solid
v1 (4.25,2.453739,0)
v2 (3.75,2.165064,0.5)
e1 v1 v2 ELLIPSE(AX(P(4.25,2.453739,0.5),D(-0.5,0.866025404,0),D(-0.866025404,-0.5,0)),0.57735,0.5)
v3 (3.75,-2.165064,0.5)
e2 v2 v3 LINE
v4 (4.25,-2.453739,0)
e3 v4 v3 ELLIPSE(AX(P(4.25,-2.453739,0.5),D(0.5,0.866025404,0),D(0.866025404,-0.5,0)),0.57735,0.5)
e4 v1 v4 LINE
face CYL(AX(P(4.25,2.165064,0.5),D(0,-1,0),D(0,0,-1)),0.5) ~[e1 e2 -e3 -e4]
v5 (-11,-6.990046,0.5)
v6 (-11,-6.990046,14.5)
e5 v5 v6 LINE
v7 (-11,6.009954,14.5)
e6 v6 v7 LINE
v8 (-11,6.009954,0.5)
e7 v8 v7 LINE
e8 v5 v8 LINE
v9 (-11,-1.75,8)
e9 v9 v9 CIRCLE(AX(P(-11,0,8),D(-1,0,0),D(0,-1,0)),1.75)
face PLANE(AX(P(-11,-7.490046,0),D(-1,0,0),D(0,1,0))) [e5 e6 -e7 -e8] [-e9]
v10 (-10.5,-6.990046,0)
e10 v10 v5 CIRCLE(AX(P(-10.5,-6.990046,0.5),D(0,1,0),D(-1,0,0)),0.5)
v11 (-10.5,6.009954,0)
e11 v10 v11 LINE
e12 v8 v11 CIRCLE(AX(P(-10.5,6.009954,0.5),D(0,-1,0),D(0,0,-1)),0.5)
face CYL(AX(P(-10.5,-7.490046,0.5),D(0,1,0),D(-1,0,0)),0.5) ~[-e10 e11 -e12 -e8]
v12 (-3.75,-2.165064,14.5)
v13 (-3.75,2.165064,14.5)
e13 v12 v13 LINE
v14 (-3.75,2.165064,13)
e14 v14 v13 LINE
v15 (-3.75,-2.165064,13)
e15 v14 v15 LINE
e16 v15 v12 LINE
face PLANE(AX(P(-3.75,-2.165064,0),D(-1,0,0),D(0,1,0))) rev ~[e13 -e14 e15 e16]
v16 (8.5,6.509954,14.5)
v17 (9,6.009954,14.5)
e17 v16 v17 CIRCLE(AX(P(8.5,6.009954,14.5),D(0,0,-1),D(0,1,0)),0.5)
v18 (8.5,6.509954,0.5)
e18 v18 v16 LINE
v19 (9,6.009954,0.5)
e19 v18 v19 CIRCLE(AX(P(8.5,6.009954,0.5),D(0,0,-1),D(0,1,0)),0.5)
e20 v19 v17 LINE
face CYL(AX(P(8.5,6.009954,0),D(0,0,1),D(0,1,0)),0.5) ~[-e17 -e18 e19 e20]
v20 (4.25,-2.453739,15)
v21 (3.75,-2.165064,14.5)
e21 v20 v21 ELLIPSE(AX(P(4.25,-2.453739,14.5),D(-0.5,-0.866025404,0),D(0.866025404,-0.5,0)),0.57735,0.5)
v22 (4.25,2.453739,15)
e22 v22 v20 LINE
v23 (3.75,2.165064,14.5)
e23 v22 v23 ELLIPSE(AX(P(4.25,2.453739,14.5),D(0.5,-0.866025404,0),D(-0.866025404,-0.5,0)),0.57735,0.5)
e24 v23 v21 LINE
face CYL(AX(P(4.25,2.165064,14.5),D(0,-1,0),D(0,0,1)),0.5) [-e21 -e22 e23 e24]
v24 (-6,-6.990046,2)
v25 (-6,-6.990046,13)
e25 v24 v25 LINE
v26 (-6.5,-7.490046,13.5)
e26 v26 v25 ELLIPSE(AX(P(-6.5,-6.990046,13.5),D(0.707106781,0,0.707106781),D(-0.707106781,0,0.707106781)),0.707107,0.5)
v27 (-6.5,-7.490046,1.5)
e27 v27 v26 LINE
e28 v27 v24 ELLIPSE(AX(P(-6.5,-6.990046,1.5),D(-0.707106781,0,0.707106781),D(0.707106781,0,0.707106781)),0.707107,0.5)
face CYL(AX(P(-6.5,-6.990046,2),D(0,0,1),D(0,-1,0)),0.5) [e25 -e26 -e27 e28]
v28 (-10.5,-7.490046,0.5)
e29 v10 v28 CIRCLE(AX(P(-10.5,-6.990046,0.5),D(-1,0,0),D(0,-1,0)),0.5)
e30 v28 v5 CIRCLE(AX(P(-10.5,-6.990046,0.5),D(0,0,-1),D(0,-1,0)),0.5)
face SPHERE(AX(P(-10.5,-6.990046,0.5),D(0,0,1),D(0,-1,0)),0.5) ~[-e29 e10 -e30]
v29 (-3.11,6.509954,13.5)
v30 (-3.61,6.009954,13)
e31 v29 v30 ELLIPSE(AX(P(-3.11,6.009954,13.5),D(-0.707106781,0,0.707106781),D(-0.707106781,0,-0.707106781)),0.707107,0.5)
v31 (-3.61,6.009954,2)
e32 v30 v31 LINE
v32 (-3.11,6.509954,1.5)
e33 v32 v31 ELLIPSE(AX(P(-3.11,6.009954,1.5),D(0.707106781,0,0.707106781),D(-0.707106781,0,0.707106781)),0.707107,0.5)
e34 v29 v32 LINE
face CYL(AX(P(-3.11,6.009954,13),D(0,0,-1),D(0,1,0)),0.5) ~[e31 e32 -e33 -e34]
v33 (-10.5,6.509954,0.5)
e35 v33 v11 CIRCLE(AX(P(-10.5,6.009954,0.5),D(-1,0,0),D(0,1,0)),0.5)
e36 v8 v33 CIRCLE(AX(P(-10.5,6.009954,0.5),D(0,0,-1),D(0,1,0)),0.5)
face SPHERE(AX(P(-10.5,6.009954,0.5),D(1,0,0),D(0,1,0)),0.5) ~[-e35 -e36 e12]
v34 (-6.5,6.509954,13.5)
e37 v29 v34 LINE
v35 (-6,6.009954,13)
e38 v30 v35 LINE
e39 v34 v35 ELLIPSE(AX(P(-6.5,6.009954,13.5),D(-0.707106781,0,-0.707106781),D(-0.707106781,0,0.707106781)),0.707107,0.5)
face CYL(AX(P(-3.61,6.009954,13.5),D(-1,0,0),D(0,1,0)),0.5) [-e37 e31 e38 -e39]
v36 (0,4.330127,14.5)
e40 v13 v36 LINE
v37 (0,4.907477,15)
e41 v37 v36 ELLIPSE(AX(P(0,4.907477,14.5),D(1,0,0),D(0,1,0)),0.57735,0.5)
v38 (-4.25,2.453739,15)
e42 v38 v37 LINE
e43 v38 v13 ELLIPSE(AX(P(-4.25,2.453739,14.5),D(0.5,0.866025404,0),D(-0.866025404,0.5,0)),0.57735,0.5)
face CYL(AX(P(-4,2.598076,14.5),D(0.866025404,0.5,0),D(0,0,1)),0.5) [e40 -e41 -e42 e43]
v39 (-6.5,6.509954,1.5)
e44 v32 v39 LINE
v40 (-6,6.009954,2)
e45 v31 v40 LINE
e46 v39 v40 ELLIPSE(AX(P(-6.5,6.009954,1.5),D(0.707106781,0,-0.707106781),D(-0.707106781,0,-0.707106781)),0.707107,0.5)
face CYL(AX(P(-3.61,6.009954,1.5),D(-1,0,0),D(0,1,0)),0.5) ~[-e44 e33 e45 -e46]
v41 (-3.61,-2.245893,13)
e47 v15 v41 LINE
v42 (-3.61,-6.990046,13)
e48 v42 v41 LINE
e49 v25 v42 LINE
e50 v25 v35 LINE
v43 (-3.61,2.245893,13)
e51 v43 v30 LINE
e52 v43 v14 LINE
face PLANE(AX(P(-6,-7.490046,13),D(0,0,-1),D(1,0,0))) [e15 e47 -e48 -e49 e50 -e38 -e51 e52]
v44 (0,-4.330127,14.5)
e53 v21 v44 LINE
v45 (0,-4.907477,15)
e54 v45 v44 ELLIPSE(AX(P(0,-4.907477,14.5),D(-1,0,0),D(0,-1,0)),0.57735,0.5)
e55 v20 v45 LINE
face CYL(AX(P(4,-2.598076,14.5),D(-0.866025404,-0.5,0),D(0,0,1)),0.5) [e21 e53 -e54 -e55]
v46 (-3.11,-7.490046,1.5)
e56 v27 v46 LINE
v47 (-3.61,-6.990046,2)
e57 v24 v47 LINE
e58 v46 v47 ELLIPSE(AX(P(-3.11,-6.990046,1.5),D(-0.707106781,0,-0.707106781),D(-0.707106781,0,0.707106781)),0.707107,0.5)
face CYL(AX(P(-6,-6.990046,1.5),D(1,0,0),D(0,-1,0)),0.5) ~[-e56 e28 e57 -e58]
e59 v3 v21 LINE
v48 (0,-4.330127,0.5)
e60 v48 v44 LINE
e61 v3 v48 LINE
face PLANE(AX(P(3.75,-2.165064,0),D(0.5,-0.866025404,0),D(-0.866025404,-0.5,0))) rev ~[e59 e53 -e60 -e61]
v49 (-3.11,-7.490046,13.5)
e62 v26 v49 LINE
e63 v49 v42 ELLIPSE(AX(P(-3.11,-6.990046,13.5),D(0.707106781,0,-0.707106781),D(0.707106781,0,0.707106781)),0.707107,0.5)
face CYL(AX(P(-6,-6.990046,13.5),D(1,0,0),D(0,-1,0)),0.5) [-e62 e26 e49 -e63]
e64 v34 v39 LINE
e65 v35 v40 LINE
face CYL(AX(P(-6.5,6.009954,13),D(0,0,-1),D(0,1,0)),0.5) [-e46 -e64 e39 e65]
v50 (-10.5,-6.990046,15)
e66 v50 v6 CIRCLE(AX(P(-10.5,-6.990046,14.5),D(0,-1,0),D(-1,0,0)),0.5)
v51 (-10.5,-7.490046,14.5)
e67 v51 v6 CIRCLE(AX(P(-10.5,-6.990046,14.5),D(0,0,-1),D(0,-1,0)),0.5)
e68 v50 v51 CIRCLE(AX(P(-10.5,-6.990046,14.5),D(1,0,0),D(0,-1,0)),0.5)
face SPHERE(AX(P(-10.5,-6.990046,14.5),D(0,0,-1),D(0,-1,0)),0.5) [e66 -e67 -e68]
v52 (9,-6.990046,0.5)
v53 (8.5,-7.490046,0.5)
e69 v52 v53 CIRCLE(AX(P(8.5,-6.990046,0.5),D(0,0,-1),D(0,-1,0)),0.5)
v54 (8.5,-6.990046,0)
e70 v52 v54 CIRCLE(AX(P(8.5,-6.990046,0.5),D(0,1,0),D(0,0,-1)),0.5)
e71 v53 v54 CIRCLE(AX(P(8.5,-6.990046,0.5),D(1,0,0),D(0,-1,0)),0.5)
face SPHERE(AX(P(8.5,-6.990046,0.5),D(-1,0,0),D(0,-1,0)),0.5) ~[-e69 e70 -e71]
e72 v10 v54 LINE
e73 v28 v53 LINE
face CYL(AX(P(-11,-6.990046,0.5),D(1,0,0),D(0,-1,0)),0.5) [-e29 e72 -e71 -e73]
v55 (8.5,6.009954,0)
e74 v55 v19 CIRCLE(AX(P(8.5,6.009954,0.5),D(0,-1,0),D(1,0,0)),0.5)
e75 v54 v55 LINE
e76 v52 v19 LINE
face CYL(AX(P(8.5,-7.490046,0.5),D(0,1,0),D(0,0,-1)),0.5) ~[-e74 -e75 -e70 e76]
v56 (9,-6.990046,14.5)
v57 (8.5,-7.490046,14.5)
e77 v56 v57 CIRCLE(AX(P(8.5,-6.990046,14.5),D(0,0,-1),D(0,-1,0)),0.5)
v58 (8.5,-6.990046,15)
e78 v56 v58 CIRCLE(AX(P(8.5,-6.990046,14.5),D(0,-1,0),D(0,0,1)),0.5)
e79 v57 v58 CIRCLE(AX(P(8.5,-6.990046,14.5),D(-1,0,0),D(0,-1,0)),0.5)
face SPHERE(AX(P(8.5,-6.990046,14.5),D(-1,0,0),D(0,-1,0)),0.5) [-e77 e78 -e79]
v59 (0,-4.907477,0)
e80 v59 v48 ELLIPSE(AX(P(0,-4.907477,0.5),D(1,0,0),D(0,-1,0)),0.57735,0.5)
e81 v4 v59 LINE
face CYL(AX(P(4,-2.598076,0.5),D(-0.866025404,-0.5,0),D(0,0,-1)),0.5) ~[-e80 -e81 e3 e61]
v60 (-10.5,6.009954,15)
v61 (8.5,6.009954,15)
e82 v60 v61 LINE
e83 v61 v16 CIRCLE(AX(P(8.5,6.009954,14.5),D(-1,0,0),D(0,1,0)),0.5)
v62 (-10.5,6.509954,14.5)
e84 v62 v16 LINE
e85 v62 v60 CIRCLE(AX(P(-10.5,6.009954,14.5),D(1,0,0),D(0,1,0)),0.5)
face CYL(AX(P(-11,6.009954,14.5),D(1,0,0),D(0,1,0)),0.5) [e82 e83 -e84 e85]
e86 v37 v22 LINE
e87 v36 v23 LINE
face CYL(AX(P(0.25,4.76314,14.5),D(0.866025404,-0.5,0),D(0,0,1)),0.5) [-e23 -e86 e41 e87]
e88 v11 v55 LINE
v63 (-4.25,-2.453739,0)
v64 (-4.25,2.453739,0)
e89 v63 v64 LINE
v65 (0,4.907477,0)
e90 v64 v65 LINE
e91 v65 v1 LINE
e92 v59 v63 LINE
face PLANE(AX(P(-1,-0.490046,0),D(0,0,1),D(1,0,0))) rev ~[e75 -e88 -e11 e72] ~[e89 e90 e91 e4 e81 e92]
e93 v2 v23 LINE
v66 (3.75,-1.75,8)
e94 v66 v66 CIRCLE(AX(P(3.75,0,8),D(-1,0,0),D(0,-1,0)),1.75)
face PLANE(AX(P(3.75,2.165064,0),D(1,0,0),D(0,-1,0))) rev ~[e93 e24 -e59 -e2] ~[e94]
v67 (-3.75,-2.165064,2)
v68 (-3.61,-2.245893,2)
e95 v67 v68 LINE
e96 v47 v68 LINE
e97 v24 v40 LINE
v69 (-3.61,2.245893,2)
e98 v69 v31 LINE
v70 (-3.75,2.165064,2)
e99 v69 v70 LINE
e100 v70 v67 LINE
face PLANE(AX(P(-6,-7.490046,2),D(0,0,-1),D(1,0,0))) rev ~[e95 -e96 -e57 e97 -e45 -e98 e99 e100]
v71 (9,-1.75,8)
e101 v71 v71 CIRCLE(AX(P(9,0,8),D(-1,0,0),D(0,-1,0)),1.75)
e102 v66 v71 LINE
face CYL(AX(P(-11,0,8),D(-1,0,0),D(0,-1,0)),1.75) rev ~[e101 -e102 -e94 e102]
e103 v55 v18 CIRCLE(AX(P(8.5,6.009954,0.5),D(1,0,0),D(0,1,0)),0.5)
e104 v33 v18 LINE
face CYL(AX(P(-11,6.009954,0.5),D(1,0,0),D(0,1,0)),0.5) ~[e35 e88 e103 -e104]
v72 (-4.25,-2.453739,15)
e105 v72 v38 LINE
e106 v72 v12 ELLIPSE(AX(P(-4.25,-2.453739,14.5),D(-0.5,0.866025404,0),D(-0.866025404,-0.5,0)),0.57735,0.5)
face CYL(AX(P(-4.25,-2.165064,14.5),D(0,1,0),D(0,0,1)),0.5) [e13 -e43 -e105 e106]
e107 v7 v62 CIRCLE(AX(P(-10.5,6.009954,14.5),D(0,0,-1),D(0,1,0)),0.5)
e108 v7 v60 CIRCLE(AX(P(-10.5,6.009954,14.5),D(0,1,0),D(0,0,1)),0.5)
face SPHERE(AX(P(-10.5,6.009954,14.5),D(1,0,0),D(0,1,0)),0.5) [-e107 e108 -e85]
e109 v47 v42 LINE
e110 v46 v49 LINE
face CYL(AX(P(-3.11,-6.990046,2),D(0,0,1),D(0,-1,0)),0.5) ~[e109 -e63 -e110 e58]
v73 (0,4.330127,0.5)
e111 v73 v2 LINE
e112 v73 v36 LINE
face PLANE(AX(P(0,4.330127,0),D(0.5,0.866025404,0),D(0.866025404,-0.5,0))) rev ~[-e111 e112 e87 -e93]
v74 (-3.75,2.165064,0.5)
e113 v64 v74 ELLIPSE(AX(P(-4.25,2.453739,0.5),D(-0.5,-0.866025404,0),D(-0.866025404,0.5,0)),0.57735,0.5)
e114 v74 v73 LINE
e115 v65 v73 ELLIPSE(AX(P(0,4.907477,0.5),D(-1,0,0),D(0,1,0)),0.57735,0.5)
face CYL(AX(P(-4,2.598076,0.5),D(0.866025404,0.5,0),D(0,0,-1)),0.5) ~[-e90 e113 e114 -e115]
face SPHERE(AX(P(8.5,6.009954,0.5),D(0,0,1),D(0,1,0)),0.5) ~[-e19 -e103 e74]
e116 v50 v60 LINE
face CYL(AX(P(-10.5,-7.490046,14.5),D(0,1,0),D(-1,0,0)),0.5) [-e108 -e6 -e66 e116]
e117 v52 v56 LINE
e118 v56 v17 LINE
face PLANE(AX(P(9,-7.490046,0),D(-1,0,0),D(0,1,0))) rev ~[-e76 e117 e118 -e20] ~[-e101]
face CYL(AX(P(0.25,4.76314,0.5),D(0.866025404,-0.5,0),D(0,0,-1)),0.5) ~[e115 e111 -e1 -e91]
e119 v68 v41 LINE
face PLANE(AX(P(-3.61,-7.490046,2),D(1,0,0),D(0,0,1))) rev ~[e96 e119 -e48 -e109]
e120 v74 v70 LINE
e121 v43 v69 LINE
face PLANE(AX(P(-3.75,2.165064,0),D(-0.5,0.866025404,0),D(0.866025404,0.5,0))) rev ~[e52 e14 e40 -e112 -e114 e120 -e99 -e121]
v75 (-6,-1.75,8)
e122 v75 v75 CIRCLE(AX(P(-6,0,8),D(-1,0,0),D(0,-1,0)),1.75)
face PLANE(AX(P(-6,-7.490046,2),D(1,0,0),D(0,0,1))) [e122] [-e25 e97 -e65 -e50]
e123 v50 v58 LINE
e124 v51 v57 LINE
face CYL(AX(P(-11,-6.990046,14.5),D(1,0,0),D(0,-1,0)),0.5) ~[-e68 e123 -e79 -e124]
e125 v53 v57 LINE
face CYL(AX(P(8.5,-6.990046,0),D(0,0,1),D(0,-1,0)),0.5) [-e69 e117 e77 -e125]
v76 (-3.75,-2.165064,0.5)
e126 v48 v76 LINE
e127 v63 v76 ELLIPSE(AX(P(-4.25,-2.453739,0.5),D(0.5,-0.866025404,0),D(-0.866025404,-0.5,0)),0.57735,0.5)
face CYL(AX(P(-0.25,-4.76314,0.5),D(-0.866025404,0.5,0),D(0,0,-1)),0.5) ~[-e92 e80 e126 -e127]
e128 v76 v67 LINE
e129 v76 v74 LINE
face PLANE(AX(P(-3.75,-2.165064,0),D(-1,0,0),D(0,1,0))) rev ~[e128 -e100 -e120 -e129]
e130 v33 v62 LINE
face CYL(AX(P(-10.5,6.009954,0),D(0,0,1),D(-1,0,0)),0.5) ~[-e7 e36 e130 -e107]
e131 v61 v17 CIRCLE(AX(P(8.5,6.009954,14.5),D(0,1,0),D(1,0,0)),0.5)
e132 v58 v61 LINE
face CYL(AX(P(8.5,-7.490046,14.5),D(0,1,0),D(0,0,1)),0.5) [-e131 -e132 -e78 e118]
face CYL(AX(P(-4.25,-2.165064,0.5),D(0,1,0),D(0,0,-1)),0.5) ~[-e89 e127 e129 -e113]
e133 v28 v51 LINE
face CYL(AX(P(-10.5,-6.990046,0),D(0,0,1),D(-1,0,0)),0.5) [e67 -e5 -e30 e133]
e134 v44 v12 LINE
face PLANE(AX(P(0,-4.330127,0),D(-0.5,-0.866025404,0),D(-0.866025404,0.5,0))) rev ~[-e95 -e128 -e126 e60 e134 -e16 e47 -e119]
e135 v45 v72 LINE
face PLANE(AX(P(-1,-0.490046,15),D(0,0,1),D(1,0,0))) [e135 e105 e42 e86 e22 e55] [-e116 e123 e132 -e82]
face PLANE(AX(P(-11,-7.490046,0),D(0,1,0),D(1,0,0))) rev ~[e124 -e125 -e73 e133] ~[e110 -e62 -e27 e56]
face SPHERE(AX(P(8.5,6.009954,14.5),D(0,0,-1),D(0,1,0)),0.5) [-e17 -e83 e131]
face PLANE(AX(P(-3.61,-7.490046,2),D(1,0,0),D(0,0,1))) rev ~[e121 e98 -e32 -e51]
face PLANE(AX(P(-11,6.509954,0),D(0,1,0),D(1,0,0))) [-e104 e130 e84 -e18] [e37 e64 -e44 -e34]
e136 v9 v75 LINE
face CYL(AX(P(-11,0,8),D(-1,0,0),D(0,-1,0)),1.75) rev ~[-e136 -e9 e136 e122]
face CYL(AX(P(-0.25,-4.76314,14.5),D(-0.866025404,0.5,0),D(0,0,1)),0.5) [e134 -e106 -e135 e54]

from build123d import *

# Parameters (mm, degrees)
F0_W          = 20
F0_H          = 14
F1_DEPTH      = 15
F2_W          = 2.39
F2_H          = 11
F3_DEPTH      = 14.001
F5_R          = 0.5
F4_R          = 1.75
F6_DEPTH      = 42
F6_DEPTH_BACK = 20.001


# Not quite as in the source:
# - an extrude ends at something that could not be found from the text; its depth is read off the source's solid


with BuildPart() as f1:
    # F0 (on Top) → F1 (new body)
    with BuildSketch(Plane.XY):
        with Locations((-1, -0.4900455125)):
            Rectangle(F0_W, F0_H)
        Polygon((3.75, -2.1650635095), (0, -4.3301270189), (-3.75, -2.1650635095), (-3.75, 2.1650635095), (0, 4.3301270189), (3.75, 2.1650635095), align=None, mode=Mode.SUBTRACT)
    extrude(amount=F1_DEPTH)

    # F2 (on face) → F3 (cut, through all)
    with BuildSketch(Plane.XZ.offset(7.4900455125)):
        with Locations((-4.805, 7.5)):
            Rectangle(F2_W, F2_H)
    extrude(amount=-F3_DEPTH, mode=Mode.SUBTRACT)

    # F5
    f5_edges = [f1.edges().sort_by_distance(p)[0] for p in [
        (-11, -7.490046, 7.5),
        (-1, -7.490046, 0),
        (-1, -7.490046, 15),
        (9, -7.490046, 7.5),
        (-3.61, -7.490046, 7.5),
        (-4.805, -7.490046, 2),
        (-6, -7.490046, 7.5),
        (-4.805, -7.490046, 13),
        (9, 6.509954, 7.5),
        (-1, 6.509954, 0),
        (-1, 6.509954, 15),
        (-11, 6.509954, 7.5),
        (-4.805, 6.509954, 13),
        (-6, 6.509954, 7.5),
        (-4.805, 6.509954, 2),
        (-3.61, 6.509954, 7.5),
        (9, -0.490046, 15),
        (-11, -0.490046, 15),
        (3.75, 0, 15),
        (1.875, -3.247595, 15),
        (-1.875, -3.247595, 15),
        (-3.75, 0, 15),
        (-1.875, 3.247595, 15),
        (1.875, 3.247595, 15),
        (9, -0.490046, 0),
        (-11, -0.490046, 0),
        (3.75, 0, 0),
        (1.875, -3.247595, 0),
        (-1.875, -3.247595, 0),
        (-3.75, 0, 0),
        (-1.875, 3.247595, 0),
        (1.875, 3.247595, 0),
    ]]
    fillet(f5_edges, radius=F5_R)

    # F4 (on face) → F6 (cut, two sides)
    with BuildSketch(Plane(origin=(-11, 0, 0), x_dir=(0, -1, 0), z_dir=(-1, 0, 0))) as f6_sk:
        with Locations((0, 8)):
            Circle(F4_R)
    extrude(amount=F6_DEPTH, mode=Mode.SUBTRACT)
    extrude(f6_sk.sketch, amount=-F6_DEPTH_BACK, mode=Mode.SUBTRACT)


solid = f1.part
